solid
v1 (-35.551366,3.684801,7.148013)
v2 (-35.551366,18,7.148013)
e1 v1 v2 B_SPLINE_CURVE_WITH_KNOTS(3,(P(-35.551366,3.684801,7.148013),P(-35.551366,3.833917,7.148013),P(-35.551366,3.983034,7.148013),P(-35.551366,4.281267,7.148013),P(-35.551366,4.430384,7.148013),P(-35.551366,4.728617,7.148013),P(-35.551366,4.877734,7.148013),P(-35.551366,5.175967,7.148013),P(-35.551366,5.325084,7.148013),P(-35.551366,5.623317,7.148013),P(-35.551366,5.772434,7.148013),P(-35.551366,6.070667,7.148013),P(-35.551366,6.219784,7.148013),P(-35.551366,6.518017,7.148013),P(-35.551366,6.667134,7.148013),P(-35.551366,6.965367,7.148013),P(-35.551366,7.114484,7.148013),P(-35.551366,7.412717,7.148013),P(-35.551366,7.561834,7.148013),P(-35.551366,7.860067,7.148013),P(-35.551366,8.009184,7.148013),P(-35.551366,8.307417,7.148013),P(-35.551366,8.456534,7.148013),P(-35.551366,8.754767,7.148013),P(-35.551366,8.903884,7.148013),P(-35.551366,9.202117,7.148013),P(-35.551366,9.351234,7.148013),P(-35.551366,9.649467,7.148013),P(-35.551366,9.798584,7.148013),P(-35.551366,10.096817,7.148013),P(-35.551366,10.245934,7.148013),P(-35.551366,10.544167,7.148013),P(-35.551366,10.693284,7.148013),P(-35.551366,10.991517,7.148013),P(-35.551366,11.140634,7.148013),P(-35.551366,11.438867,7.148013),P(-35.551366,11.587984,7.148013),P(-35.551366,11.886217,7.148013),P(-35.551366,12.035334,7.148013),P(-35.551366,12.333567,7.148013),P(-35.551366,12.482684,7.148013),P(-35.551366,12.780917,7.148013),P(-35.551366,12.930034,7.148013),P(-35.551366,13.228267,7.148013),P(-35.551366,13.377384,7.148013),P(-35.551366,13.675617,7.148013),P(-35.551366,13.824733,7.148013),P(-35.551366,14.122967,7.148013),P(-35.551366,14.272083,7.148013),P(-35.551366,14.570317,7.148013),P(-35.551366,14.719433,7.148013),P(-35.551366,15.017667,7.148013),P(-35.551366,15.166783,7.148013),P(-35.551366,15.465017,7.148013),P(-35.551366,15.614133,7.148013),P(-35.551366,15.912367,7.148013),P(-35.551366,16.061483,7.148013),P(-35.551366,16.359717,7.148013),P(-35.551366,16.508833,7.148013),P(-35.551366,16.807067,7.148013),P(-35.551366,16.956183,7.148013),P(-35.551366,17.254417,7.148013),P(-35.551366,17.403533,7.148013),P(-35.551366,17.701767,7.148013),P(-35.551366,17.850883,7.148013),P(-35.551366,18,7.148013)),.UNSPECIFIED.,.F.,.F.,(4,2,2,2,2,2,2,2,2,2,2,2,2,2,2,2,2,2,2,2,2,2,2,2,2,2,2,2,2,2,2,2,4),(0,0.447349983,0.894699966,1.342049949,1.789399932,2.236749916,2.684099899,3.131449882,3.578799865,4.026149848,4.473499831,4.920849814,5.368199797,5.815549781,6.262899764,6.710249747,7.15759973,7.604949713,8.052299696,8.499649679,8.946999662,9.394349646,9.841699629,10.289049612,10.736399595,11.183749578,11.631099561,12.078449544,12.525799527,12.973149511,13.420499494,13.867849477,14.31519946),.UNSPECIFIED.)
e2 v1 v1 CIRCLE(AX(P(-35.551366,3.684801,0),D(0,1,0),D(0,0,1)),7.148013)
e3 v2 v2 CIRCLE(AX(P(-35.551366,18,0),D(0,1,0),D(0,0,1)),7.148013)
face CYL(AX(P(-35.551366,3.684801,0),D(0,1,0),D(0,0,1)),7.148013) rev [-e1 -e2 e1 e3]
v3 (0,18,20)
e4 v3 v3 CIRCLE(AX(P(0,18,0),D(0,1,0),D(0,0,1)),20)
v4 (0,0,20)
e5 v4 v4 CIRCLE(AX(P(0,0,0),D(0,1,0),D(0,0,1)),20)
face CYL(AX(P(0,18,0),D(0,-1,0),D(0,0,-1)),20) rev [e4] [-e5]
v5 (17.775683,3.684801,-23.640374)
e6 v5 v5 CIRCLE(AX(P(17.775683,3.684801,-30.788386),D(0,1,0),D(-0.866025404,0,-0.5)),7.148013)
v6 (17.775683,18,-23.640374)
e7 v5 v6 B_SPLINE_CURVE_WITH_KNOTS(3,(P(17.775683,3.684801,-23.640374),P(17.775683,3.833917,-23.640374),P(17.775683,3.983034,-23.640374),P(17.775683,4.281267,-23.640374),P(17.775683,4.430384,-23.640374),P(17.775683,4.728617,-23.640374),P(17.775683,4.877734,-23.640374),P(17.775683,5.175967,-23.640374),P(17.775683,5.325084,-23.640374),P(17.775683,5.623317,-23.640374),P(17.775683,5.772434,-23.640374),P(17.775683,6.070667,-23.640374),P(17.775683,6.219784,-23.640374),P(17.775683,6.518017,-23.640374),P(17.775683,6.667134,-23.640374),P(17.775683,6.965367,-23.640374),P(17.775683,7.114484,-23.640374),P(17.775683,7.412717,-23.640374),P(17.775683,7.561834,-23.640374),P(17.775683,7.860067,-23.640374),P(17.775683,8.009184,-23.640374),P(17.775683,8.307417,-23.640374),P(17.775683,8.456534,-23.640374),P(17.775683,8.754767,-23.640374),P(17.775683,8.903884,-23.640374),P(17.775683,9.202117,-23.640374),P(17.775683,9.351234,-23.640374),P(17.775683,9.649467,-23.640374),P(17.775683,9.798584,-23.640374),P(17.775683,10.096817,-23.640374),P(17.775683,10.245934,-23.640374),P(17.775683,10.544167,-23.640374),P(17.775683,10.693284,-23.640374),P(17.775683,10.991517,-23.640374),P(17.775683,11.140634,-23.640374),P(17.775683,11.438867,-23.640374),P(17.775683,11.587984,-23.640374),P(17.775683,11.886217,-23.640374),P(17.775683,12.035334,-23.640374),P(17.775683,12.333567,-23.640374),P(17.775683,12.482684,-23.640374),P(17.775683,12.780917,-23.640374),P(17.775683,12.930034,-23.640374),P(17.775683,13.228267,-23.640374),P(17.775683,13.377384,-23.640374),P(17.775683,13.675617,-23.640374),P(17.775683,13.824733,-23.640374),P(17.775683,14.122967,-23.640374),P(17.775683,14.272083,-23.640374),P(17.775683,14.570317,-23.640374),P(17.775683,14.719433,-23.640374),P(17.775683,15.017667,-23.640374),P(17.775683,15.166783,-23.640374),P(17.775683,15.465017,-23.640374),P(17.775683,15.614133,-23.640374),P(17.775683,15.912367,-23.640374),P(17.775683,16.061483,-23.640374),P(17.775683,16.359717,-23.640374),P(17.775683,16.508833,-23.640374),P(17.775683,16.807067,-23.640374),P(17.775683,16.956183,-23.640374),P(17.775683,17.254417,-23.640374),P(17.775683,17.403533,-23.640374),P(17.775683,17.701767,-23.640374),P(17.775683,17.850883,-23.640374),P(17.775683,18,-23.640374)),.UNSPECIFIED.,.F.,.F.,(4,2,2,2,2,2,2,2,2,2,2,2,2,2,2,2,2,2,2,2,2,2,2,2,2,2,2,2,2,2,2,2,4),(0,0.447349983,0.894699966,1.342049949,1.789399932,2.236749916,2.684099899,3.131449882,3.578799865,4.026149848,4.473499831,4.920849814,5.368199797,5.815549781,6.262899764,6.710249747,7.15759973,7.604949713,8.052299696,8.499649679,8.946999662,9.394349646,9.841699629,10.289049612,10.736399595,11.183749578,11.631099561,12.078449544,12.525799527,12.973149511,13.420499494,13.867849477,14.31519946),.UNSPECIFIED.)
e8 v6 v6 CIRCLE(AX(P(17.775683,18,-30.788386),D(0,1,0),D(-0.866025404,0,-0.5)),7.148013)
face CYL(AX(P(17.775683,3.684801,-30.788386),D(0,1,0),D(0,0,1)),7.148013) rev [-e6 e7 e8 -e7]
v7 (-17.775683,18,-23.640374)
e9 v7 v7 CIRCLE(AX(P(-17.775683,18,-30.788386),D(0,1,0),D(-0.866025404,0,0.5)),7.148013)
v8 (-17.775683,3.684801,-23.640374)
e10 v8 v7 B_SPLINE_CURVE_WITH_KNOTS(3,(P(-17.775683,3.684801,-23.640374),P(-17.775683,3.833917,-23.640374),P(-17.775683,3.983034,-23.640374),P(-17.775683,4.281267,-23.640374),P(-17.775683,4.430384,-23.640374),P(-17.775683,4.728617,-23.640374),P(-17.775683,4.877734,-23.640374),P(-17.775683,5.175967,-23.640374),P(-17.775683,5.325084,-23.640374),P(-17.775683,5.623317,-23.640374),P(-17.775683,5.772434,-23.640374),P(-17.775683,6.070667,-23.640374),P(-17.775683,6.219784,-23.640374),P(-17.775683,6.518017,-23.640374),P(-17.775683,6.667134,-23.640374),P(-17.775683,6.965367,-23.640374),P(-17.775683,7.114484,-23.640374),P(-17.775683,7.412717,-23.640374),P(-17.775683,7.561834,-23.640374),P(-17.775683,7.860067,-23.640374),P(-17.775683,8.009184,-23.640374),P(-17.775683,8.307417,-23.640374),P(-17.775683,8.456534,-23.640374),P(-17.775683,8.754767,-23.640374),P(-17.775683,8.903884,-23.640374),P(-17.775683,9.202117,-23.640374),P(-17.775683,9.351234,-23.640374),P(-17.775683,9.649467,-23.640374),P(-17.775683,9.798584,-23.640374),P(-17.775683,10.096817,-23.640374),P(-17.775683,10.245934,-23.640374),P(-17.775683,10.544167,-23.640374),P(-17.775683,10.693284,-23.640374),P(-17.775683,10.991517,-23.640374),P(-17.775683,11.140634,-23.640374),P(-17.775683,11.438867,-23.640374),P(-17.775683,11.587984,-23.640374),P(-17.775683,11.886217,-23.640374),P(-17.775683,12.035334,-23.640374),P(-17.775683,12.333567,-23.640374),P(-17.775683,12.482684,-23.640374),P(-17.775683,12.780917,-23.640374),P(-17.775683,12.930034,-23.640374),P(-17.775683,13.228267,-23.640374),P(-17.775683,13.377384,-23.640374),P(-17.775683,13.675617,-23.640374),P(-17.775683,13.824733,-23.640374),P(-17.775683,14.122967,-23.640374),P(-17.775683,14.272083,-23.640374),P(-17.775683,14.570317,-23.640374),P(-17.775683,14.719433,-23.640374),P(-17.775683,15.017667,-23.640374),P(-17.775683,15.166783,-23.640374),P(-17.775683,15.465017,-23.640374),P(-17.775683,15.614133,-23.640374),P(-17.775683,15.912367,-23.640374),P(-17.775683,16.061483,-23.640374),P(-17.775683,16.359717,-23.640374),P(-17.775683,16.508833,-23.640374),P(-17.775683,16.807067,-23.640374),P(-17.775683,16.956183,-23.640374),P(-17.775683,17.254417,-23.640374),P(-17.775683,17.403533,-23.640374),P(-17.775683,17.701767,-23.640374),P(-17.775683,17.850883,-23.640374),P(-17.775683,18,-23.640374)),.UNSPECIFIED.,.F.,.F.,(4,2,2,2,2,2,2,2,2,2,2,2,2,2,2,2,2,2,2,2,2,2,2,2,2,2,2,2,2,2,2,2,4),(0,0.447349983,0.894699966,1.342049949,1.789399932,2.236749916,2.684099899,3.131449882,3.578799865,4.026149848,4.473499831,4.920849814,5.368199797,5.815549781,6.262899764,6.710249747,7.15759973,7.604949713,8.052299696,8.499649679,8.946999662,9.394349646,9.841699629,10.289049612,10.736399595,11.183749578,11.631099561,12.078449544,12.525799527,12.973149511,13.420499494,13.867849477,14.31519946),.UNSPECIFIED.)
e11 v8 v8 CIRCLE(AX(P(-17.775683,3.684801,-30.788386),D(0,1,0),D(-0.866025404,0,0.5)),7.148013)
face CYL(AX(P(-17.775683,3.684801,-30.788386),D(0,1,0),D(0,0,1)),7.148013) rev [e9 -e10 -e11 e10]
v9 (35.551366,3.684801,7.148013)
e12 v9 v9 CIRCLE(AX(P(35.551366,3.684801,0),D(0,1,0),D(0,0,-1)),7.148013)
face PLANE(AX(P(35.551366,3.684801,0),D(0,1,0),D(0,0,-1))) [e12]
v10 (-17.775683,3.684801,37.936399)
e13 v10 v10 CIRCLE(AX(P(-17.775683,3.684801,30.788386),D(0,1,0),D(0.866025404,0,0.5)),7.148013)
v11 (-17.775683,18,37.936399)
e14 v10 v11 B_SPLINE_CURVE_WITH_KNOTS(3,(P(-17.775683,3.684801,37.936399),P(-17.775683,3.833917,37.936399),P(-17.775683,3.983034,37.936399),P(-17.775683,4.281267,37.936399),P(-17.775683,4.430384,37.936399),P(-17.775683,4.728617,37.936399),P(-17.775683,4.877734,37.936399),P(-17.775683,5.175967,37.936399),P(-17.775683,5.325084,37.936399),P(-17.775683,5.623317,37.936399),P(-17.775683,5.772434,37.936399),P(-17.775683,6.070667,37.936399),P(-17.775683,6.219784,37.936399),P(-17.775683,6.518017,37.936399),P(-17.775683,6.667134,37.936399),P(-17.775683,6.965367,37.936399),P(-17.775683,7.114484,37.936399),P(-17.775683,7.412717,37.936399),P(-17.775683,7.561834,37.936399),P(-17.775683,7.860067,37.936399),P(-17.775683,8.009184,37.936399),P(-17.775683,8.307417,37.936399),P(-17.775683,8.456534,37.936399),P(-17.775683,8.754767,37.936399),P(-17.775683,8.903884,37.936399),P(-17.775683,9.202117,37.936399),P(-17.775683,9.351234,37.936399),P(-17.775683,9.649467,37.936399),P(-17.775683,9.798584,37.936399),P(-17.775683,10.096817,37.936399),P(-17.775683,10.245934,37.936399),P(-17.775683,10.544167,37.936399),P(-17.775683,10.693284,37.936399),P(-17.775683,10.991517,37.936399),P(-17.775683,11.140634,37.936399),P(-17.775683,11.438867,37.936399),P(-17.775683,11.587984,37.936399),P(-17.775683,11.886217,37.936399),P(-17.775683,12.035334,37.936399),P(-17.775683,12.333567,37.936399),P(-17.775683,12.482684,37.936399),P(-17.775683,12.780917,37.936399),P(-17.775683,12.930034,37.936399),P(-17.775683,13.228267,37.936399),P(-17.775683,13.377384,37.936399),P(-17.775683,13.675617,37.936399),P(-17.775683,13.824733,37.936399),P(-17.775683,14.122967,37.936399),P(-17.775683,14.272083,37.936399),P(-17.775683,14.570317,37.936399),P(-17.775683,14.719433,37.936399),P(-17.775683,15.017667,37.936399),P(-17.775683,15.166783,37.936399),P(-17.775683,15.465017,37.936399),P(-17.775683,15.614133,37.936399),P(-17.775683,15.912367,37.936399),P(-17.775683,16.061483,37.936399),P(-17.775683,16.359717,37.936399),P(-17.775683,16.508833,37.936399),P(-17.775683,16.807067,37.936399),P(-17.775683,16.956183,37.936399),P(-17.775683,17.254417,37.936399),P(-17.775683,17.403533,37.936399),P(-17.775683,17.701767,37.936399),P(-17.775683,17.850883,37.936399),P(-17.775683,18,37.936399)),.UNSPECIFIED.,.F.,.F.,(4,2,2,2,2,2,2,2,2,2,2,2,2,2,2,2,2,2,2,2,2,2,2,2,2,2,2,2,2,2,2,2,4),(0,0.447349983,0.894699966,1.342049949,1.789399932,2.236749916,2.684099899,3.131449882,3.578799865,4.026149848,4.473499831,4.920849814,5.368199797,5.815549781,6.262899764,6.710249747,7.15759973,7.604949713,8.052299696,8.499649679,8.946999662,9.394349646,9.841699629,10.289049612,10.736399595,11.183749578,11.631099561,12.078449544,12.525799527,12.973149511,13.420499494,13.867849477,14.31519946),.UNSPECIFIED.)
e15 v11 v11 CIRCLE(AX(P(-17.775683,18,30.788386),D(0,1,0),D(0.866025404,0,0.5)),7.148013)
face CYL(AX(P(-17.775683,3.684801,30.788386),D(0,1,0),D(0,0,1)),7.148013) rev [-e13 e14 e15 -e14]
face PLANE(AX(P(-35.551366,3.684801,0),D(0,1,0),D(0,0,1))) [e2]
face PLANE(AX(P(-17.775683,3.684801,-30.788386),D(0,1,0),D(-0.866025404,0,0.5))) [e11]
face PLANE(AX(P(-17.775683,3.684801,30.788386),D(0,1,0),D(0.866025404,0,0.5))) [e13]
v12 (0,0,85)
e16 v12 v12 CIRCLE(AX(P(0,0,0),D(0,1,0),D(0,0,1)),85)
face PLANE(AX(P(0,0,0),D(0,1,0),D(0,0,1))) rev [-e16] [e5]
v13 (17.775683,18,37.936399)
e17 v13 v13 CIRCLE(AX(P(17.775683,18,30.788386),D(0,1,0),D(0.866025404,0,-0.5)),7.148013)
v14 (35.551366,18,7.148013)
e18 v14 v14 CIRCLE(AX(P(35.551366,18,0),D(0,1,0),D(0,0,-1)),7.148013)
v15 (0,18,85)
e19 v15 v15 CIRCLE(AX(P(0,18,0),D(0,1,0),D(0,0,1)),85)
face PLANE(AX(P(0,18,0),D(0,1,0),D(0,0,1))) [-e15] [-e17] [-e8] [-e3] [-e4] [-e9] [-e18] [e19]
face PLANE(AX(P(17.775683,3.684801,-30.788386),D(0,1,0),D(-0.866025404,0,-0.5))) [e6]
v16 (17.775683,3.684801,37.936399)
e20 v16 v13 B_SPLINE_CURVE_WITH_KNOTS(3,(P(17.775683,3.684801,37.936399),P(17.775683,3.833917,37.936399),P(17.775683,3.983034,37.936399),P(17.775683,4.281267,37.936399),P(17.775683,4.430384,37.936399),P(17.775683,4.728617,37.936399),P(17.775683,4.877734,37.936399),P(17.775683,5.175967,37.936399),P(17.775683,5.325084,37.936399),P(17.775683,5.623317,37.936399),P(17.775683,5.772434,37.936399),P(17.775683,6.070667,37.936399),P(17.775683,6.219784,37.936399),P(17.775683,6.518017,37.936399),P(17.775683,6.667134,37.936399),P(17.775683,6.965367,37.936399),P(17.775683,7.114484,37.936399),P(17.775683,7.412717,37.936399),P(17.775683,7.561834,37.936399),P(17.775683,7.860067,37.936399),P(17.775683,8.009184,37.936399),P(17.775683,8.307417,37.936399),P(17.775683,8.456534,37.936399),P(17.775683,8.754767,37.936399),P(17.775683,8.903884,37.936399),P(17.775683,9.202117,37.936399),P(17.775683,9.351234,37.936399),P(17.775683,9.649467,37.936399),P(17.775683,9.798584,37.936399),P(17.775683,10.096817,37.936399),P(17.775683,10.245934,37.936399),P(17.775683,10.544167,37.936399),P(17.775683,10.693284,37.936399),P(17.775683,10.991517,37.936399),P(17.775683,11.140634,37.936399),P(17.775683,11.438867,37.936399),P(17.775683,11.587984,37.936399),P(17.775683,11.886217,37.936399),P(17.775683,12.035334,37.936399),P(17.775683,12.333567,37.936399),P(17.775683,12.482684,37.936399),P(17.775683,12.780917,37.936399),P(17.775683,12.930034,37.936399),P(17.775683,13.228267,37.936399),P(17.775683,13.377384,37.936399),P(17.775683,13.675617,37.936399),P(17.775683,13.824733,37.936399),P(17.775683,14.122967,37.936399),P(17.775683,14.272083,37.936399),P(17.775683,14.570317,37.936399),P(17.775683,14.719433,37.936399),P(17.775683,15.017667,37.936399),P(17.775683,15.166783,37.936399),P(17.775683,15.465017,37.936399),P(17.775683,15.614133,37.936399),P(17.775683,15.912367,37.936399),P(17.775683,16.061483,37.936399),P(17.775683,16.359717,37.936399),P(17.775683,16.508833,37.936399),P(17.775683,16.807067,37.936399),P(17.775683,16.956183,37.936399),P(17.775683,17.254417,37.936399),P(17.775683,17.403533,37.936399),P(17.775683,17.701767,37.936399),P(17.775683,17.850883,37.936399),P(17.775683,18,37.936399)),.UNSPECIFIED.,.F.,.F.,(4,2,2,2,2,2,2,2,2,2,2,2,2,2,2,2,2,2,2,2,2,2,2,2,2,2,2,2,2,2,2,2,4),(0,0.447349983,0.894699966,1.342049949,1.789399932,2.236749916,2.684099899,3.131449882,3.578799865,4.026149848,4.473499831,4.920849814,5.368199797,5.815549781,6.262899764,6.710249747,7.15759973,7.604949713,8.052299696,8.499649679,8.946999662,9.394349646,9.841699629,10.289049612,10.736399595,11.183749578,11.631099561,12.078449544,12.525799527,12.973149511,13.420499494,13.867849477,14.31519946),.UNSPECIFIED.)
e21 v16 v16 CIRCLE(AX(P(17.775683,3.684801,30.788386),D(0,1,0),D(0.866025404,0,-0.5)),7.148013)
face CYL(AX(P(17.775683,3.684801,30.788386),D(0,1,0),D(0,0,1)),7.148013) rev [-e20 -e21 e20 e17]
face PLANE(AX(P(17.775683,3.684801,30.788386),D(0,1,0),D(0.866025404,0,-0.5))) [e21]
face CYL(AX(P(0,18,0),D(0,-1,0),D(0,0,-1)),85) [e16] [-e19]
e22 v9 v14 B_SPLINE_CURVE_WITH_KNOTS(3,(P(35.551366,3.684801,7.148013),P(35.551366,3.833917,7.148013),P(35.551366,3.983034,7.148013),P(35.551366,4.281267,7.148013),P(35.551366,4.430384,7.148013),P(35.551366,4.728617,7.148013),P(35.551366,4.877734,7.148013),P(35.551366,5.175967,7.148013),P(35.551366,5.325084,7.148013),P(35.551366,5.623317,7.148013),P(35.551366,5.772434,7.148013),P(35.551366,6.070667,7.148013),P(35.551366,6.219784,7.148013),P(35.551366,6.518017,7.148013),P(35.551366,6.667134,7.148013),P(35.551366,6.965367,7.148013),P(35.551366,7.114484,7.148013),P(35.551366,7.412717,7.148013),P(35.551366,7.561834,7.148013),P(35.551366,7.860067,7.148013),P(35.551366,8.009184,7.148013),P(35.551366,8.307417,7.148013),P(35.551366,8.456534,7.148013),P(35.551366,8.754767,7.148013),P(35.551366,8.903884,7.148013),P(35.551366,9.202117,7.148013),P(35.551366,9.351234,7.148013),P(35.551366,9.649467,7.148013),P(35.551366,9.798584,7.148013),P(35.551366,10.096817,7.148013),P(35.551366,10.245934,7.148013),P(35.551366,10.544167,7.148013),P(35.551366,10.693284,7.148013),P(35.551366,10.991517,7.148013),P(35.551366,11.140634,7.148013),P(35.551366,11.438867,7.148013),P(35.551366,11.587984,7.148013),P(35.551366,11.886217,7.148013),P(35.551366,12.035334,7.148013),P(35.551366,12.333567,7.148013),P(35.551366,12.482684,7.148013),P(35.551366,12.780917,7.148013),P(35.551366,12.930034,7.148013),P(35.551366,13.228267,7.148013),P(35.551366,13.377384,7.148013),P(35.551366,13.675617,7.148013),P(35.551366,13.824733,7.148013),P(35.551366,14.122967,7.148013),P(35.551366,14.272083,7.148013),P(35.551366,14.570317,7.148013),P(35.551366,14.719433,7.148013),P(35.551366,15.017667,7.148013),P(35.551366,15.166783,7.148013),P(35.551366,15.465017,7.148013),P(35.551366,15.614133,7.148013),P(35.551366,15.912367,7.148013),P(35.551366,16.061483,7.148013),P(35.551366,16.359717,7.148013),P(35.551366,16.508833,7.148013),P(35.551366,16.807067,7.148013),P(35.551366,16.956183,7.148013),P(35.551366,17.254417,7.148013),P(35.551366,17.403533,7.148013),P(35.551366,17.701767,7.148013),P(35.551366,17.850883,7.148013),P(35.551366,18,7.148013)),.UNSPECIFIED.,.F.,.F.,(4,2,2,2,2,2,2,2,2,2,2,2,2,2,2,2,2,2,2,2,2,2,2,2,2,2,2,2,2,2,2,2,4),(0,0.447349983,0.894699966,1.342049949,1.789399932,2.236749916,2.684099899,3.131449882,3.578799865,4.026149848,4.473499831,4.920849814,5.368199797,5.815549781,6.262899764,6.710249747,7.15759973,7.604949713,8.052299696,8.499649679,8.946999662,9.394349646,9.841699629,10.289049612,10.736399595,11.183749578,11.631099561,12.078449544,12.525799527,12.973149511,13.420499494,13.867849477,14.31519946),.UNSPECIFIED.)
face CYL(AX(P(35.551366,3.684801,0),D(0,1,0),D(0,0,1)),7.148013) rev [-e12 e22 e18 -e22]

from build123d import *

# Parameters (mm, degrees)
SKETCH1_R           = 85
BOSS_EXTRUDE1_DEPTH = 18
SKETCH2_R           = 20
CUT_EXTRUDE1_DEPTH  = 122.548344291
SKETCH3_R           = 7.148012691
CUT_EXTRUDE2_DEPTH  = 14.31519946
CIRPATTERN1_COUNT   = 6


with BuildPart() as part:
    # Sketch1 → Boss-Extrude1 (new body)
    with BuildSketch(Plane(origin=(0, 0, 0), x_dir=(1, 0, 0), z_dir=(0, 1, 0))):
        Circle(SKETCH1_R)
    extrude(amount=BOSS_EXTRUDE1_DEPTH)

    # Sketch2 → Cut-Extrude1 (cut, through all)
    with BuildSketch(Plane(origin=(0, 0, 0), x_dir=(1, 0, 0), z_dir=(0, 1, 0))):
        Circle(SKETCH2_R)
    extrude(amount=CUT_EXTRUDE1_DEPTH, mode=Mode.SUBTRACT)

    # Sketch3 → Cut-Extrude2 (cut)
    with BuildSketch(Plane(origin=(0, 18, 0), x_dir=(1, 0, 0), z_dir=(0, 1, 0))):
        with Locations((-35.551366429, 0)):
            Circle(SKETCH3_R)
    cut_extrude2 = extrude(amount=-CUT_EXTRUDE2_DEPTH, mode=Mode.SUBTRACT)

    # CirPattern1: Cut-Extrude2 ×6 about axis
    cirpattern1_axis = Axis((0, 0, 0), (0, 1, 0))
    for i in range(1, CIRPATTERN1_COUNT):
        add(cut_extrude2.rotate(cirpattern1_axis, i * 360 / CIRPATTERN1_COUNT), mode=Mode.SUBTRACT)


solid = part.part
